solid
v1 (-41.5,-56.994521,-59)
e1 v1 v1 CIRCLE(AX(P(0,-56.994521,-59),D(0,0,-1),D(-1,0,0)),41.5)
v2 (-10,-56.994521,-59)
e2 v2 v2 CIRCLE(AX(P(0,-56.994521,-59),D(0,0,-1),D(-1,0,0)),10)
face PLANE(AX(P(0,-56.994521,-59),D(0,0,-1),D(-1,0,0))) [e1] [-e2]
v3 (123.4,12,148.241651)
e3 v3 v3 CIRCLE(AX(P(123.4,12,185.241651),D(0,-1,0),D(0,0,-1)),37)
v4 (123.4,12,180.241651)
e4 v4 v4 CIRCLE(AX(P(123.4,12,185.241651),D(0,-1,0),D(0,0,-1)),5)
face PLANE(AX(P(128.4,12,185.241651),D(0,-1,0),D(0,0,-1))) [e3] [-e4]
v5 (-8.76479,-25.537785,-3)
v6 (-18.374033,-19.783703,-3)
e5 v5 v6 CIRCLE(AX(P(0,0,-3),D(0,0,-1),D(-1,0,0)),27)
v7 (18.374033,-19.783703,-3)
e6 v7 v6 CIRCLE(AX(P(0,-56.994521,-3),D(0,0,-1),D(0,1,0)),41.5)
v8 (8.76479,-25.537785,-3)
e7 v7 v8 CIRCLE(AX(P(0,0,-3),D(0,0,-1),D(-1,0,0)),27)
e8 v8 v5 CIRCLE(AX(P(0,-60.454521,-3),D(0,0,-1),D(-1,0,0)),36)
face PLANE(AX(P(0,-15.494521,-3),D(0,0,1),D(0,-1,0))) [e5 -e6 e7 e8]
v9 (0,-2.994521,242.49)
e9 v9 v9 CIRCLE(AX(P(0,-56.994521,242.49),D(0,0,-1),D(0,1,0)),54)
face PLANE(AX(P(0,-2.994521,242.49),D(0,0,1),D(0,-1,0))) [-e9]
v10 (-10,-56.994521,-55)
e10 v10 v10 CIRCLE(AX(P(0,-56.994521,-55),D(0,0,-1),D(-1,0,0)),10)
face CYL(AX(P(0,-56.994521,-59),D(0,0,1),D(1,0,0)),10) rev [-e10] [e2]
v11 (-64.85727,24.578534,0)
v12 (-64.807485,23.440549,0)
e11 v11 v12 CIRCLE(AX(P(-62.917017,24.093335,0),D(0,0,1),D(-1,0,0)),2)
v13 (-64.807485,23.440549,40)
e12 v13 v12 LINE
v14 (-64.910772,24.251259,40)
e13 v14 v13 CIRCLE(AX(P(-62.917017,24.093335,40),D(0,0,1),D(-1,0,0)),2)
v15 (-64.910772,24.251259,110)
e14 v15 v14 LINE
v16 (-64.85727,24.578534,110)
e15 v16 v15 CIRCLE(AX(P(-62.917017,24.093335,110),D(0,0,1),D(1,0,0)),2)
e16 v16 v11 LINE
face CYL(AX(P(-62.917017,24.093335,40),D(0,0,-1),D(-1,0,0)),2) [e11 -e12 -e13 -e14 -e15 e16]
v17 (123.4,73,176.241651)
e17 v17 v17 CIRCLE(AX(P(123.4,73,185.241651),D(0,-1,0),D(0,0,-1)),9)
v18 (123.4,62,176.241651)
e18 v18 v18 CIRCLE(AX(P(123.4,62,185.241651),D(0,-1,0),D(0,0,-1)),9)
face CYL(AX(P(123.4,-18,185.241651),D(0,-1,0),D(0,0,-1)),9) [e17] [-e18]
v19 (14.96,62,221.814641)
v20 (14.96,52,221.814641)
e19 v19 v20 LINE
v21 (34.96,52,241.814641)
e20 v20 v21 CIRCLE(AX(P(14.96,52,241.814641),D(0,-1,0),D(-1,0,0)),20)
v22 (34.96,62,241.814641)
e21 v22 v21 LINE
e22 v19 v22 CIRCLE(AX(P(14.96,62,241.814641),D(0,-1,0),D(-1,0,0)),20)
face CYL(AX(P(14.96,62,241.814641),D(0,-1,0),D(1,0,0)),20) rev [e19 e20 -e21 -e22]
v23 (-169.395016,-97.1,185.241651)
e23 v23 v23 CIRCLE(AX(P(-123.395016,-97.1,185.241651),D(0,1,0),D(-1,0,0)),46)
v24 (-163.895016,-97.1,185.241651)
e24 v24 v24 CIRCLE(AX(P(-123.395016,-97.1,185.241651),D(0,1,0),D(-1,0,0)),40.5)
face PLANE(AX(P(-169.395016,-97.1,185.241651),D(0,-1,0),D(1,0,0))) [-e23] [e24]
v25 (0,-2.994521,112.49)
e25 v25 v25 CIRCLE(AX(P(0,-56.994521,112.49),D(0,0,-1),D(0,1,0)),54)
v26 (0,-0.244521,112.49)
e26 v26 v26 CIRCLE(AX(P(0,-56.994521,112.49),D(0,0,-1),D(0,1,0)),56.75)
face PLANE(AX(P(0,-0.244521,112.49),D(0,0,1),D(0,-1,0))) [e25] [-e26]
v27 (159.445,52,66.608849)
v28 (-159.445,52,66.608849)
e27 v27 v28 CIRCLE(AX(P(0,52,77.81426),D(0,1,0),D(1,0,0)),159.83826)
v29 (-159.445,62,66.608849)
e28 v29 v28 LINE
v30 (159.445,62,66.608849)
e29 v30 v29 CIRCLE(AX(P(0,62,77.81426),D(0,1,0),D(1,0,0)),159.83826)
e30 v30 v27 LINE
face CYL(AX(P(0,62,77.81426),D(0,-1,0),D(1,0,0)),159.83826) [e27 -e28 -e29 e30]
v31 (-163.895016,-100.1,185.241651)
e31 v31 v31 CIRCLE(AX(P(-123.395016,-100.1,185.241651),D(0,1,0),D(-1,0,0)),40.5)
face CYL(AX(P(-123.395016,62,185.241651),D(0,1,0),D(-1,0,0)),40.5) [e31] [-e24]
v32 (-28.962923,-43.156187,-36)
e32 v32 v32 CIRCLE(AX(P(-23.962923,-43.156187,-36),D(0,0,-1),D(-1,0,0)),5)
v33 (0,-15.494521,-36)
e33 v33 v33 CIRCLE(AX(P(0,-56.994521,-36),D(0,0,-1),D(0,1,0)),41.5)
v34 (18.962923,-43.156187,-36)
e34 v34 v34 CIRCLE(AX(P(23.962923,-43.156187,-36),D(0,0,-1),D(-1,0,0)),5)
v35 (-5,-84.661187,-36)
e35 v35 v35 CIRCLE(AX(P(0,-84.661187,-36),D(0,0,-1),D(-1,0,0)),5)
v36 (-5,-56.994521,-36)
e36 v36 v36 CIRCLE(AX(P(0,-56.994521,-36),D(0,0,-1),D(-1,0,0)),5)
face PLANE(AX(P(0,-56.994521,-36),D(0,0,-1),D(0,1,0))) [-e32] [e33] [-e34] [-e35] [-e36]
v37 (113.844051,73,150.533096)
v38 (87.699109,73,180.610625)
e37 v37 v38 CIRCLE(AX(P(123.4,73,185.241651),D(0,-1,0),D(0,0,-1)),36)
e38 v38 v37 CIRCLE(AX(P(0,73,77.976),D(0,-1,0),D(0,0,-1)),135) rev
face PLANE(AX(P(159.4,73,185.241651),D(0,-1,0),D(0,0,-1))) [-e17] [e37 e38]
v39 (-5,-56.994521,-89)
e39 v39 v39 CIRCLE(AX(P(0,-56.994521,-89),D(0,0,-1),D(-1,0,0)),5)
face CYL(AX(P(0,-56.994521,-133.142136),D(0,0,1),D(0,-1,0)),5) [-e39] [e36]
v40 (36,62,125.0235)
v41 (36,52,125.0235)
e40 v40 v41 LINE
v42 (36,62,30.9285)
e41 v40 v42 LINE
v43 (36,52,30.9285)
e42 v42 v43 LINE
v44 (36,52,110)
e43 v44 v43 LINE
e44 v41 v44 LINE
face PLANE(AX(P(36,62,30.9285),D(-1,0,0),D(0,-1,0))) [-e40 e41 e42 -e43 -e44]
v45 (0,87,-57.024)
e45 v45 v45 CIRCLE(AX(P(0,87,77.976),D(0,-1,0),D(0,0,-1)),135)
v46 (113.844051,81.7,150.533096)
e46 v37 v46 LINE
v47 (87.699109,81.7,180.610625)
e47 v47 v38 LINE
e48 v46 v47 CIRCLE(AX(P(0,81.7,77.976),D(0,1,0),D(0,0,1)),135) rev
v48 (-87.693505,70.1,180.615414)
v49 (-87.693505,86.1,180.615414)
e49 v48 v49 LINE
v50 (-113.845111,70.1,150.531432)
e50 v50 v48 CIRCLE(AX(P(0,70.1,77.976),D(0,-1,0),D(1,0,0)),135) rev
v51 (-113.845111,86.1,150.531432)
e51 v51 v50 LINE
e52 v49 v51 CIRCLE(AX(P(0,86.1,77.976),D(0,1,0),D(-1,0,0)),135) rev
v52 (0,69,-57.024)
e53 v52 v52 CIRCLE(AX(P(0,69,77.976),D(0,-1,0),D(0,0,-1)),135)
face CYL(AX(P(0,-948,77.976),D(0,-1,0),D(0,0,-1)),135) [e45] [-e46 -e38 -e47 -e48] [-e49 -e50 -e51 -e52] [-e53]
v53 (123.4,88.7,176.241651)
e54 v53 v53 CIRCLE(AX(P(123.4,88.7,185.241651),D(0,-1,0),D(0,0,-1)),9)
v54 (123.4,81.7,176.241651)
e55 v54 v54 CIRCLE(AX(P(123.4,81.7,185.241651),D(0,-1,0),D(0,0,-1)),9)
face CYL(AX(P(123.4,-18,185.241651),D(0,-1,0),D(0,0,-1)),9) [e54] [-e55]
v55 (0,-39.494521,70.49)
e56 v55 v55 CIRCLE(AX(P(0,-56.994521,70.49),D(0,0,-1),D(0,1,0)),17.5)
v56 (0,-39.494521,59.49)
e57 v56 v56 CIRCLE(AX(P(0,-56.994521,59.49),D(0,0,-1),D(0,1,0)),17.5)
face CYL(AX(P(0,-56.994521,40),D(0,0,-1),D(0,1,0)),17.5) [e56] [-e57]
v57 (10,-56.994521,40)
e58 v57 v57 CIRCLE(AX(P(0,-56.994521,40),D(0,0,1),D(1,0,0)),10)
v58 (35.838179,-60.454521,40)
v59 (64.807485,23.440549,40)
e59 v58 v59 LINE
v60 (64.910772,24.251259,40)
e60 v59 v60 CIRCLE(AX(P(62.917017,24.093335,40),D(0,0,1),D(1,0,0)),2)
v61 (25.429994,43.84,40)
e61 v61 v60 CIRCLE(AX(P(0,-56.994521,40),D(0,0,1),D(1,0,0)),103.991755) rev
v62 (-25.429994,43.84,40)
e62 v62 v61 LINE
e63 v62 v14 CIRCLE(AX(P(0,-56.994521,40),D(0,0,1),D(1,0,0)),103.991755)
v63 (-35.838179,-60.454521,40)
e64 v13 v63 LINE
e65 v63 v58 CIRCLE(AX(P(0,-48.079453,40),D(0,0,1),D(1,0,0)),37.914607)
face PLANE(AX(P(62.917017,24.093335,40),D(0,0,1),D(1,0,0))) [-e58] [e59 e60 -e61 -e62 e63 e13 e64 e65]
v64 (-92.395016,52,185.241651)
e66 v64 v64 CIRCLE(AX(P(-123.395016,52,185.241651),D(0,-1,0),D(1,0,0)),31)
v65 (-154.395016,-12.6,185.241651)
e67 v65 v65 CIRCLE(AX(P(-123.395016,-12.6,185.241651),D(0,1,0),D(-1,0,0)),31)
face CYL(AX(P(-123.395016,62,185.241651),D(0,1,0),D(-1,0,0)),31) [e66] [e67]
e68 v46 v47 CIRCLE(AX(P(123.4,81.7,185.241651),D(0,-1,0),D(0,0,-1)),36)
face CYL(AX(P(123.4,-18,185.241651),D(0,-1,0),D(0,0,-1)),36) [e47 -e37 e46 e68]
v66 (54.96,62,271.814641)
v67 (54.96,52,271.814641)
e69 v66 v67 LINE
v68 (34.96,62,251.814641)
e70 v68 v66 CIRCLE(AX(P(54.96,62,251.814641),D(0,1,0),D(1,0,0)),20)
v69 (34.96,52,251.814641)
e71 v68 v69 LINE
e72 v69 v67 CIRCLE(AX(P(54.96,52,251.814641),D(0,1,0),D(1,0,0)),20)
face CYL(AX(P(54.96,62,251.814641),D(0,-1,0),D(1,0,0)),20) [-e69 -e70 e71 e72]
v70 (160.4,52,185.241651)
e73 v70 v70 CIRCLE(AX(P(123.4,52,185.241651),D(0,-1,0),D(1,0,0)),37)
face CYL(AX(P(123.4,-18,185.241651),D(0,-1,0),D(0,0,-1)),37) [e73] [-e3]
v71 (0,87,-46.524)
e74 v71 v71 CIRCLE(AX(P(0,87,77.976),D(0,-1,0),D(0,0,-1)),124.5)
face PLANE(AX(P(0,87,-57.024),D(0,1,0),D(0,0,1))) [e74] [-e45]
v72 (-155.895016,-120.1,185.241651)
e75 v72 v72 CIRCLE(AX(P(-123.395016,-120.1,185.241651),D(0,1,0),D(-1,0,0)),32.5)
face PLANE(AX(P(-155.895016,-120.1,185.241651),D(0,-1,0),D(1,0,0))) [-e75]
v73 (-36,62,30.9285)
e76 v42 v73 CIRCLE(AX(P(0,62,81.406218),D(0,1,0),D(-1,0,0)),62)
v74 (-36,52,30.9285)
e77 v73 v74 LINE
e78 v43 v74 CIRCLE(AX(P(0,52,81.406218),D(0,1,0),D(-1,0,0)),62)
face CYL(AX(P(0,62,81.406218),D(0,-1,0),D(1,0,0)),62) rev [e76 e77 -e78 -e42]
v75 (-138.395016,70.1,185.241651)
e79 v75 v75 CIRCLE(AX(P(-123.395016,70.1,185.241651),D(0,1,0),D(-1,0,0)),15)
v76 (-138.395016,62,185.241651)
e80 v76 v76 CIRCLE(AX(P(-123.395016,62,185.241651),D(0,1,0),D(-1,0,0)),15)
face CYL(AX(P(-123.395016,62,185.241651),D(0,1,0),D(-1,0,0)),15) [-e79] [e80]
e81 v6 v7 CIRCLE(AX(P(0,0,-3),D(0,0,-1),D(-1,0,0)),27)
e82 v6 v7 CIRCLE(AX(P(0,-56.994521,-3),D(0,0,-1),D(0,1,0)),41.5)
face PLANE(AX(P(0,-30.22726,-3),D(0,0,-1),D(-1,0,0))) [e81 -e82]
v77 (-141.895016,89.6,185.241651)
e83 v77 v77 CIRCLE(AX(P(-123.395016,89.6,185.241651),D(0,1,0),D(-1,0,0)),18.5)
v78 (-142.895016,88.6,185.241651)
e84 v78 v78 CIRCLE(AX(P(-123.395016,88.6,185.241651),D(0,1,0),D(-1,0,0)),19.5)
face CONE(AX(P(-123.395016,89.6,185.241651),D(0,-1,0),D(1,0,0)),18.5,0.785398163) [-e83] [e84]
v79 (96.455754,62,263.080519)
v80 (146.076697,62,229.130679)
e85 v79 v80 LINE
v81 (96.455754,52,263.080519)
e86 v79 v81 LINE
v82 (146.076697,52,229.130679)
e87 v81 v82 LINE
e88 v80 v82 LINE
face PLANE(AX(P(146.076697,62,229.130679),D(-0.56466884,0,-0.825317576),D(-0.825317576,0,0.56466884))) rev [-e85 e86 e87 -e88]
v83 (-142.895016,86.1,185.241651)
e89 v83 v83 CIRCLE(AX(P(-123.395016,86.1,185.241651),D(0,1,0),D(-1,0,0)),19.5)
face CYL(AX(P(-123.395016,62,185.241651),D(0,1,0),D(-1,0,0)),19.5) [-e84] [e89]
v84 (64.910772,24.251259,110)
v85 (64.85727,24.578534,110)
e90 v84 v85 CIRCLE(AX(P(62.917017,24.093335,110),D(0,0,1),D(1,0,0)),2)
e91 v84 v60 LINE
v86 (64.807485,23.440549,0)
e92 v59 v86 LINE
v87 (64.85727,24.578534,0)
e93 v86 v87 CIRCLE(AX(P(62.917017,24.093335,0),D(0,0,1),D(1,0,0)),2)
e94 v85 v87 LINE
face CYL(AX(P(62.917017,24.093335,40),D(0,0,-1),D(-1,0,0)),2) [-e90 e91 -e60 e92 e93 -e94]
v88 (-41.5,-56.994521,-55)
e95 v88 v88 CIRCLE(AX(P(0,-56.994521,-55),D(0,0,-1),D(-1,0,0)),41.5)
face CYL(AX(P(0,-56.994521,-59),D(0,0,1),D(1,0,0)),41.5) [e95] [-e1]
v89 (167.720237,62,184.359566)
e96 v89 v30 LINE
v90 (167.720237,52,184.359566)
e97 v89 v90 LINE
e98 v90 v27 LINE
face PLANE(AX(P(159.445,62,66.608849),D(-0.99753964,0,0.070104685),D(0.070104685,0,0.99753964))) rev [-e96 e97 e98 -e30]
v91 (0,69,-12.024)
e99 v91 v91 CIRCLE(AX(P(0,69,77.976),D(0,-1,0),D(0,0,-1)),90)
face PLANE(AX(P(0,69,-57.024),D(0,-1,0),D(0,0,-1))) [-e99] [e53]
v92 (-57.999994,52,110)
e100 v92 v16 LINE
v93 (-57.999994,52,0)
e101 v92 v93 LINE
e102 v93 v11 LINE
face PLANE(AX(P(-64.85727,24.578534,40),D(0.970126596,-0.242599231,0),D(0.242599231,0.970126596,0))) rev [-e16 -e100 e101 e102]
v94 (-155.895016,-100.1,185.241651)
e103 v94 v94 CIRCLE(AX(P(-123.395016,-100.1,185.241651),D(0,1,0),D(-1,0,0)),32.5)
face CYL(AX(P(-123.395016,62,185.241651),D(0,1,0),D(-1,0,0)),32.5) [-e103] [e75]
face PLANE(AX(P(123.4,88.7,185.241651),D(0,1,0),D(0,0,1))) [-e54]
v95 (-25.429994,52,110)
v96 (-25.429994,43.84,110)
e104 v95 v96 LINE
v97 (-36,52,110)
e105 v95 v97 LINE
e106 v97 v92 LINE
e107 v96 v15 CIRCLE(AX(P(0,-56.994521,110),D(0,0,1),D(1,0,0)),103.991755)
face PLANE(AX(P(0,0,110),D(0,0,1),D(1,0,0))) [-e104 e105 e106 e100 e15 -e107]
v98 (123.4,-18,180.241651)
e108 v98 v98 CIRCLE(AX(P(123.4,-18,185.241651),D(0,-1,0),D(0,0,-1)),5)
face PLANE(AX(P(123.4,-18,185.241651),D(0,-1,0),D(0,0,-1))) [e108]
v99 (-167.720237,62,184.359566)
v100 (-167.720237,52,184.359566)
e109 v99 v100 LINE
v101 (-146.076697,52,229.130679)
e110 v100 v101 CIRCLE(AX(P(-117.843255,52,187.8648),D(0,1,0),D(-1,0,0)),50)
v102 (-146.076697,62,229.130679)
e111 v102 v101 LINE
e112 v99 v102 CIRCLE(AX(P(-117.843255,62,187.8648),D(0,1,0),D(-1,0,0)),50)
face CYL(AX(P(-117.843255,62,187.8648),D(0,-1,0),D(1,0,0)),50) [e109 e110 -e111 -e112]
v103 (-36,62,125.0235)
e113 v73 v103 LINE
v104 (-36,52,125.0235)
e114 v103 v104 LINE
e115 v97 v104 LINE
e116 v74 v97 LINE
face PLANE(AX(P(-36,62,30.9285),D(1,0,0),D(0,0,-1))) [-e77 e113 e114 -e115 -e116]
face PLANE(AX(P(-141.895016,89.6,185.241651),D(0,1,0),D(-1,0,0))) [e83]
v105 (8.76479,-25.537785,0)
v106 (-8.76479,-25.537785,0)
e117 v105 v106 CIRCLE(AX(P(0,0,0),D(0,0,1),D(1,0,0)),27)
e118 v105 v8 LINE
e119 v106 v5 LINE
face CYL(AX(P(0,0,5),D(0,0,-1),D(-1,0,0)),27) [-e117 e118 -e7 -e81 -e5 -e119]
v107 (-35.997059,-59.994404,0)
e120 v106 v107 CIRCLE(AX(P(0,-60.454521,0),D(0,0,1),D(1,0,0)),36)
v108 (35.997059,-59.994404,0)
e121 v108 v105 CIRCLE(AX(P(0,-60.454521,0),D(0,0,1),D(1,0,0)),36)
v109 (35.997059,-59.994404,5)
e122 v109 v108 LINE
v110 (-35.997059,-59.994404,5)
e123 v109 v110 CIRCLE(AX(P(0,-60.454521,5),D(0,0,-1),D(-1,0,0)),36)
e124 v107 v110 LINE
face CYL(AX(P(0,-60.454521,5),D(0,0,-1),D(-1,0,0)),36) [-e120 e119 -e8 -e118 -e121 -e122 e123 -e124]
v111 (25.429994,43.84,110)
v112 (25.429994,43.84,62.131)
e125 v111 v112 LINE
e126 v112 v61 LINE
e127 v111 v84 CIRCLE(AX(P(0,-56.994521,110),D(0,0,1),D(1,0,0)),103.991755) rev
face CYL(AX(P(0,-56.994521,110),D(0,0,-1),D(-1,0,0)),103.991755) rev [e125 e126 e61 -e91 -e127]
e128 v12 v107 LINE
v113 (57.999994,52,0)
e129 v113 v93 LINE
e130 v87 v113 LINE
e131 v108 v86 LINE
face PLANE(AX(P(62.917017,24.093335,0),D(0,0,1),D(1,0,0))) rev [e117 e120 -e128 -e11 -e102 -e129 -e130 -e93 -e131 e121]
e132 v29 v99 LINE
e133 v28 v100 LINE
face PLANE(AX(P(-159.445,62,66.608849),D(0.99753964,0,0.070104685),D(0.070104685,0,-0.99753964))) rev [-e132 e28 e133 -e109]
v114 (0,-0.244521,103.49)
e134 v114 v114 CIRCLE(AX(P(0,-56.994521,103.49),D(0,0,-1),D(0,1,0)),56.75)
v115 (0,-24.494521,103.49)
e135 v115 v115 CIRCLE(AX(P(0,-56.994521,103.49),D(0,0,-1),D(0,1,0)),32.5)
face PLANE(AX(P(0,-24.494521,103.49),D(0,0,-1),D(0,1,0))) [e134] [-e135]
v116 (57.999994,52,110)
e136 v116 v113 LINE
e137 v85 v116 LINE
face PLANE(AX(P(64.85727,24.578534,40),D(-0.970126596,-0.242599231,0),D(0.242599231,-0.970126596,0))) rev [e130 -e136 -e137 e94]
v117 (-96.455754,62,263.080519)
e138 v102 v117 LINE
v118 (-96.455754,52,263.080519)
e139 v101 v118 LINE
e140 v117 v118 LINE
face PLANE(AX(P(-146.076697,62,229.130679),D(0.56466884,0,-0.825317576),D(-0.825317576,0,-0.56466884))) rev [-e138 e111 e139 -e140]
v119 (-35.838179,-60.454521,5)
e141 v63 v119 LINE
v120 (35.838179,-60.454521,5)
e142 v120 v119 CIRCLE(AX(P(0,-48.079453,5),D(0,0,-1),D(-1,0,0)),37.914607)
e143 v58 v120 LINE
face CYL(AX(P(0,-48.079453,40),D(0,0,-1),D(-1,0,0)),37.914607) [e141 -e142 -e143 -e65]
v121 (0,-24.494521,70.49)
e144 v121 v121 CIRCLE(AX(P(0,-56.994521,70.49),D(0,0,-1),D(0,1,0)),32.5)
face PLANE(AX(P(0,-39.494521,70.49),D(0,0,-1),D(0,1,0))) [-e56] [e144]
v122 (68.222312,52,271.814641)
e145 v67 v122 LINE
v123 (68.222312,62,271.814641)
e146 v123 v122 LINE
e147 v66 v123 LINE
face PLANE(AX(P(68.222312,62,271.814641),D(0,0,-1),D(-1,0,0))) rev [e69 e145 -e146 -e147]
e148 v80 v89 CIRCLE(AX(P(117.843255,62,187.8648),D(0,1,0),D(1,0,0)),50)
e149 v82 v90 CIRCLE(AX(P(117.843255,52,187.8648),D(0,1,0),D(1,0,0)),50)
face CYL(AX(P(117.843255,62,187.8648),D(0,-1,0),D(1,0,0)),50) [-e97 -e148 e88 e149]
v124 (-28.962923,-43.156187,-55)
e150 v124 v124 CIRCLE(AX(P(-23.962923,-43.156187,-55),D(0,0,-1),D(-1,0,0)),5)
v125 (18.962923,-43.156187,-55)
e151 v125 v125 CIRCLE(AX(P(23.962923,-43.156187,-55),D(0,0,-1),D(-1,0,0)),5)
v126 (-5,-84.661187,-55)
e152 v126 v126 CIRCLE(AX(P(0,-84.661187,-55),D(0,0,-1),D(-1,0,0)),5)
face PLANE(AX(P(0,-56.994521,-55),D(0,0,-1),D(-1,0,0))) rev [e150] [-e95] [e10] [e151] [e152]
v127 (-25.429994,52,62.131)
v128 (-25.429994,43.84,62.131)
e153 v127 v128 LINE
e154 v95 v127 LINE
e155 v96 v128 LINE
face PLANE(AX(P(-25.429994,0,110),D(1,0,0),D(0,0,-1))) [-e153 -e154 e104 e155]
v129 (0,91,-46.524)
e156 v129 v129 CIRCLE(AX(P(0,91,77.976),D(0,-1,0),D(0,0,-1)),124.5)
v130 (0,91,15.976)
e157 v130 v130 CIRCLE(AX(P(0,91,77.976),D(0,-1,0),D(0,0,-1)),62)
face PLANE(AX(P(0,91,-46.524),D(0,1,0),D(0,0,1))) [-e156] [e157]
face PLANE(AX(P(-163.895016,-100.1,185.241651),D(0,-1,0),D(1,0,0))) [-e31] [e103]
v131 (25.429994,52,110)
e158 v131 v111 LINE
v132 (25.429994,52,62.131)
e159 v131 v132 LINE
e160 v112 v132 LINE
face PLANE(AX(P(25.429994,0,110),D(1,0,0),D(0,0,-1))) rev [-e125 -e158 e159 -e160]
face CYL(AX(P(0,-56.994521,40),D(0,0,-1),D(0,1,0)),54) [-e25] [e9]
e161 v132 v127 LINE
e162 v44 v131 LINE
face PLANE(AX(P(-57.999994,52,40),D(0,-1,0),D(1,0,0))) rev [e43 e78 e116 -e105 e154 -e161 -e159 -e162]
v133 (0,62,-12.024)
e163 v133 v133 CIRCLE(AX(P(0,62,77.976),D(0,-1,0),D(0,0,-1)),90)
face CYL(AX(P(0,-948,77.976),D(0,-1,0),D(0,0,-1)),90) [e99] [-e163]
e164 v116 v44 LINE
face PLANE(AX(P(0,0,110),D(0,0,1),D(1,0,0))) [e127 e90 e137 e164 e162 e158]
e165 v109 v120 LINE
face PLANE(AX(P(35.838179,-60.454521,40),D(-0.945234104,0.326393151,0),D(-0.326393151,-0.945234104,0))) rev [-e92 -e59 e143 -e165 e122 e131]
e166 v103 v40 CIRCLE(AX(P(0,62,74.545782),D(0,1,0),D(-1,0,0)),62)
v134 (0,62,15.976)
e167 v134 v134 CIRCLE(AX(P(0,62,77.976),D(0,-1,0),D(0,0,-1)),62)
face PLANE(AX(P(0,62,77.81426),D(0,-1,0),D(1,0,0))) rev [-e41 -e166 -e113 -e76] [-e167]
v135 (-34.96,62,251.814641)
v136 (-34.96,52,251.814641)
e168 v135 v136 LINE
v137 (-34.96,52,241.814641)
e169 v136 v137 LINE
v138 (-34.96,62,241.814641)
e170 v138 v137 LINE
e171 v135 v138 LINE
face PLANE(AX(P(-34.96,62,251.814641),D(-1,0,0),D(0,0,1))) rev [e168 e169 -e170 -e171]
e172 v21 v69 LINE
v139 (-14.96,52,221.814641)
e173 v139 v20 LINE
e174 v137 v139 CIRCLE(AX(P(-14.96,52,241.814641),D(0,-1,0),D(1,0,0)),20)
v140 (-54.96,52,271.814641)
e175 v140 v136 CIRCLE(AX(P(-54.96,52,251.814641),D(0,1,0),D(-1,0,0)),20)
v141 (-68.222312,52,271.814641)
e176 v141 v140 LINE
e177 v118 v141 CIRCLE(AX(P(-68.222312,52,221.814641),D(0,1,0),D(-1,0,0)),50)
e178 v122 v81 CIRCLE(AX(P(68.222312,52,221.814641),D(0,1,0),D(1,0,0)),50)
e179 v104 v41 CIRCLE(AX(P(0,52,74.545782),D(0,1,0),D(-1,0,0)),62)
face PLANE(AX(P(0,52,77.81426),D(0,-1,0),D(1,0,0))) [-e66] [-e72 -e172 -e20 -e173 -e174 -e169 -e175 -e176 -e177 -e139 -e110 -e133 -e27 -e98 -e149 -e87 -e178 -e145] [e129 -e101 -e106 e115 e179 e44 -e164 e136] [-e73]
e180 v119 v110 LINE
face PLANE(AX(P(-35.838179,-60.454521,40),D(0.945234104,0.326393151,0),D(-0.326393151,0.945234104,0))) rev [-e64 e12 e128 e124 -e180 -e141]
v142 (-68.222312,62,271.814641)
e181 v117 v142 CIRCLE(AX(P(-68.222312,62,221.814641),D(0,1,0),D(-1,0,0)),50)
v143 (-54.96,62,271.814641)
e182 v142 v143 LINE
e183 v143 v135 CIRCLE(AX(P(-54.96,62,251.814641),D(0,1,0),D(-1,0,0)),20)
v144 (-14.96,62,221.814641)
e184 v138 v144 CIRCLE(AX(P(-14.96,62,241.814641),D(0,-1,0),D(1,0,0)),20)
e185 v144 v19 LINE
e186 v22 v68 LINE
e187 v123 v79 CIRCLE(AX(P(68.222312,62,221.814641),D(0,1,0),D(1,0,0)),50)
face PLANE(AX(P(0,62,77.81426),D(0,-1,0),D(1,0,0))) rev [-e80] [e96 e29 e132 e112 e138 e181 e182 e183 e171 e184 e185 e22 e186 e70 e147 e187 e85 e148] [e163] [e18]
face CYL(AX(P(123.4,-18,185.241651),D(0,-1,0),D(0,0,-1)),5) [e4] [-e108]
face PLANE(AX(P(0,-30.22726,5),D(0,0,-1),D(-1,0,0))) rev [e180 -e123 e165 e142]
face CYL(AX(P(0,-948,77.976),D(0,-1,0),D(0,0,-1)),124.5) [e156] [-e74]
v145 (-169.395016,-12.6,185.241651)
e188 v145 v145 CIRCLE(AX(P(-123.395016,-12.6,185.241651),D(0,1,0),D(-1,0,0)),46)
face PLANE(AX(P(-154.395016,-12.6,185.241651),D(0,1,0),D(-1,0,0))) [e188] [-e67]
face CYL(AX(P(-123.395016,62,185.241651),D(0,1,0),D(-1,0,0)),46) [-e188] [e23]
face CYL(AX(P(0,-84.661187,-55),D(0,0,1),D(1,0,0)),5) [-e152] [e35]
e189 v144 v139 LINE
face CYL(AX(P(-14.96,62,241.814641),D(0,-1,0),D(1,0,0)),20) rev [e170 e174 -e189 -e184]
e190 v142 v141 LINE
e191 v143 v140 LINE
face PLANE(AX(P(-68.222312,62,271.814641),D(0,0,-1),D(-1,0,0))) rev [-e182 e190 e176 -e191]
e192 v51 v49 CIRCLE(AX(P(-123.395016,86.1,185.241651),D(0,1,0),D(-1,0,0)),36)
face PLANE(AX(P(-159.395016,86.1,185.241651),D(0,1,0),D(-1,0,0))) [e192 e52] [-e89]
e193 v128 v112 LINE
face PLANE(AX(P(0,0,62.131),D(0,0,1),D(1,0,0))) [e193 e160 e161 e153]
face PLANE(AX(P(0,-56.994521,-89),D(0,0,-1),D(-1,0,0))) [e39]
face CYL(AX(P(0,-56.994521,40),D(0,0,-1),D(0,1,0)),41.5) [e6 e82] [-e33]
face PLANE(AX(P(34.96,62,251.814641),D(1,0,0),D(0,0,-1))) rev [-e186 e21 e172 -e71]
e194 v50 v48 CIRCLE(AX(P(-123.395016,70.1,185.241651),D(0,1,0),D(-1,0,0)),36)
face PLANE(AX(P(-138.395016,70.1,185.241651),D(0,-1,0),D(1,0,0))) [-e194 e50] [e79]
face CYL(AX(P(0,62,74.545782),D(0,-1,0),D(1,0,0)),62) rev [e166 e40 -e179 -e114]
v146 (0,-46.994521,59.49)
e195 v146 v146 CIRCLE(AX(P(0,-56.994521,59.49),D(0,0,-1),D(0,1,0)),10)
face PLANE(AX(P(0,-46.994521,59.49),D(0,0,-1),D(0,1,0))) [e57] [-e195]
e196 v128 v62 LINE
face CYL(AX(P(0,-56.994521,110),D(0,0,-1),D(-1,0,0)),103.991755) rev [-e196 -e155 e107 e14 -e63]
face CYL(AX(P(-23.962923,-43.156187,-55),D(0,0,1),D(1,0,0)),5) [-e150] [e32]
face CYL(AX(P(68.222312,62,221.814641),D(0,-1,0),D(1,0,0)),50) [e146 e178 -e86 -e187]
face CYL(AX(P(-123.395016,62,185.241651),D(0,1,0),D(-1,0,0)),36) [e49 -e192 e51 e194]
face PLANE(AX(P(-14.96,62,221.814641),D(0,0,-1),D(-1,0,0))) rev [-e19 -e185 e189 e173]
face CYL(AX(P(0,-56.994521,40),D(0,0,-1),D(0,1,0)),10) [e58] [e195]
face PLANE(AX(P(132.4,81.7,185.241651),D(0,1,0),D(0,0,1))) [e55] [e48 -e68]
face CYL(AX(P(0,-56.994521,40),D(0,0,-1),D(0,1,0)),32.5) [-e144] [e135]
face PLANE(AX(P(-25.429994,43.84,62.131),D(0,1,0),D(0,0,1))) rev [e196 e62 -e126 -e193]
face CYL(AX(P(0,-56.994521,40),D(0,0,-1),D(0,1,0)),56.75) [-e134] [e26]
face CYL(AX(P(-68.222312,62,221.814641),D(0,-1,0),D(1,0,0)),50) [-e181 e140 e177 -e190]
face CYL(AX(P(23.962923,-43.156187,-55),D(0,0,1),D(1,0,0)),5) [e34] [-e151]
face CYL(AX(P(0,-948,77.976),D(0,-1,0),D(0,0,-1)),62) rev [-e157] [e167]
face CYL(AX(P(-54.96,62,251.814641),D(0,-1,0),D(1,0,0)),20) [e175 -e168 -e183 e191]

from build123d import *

# Parameters (mm, degrees)
ESTRUSIONE_ESTRUSIONE1_DEPTH      = 40
ESTRUSIONE_ESTRUSIONE2_DEPTH      = 70
SCHIZZO27_W                       = 50.85998704
SCHIZZO27_H                       = 8.16
ESTRUSIONE_ESTRUSIONE10_DEPTH     = 22.131
ESTRUSIONE_ESTRUSIONE5_DEPTH      = 3
ESTRUSIONE_ESTRUSIONE5_DEPTH_BACK = 5
SCHIZZO9_W                        = 33
SCHIZZO9_H                        = 41.5
SCHIZZO14_R                       = 5
ESTRUSIONE_ESTRUSIONE6_DEPTH      = 19
SCHIZZO15_R                       = 41.5
SCHIZZO15_R_2                     = 10
ESTRUSIONE_ESTRUSIONE7_DEPTH      = 4
SCHIZZO16_R                       = 5
ESTRUSIONE_ESTRUSIONE8_DEPTH      = 53
ESTRUSIONE_ESTRUSIONE9_DEPTH      = 10


# Read off the part's stored shape, not the designer's step: Estrusione-Estrusione2
with BuildPart() as part:
    # Schizzo1 → Estrusione-Estrusione1 (new body)
    with BuildSketch(Plane.XY):
        with BuildLine():
            Line((-35.838179279, -60.454520749), (-64.807485396, 23.440548807))
            ThreePointArc((-64.807485396, 23.440548807), (-64.915106011, 24.005921967), (-64.857270382, 24.57853357))
            Line((-64.857270382, 24.57853357), (-57.99999352, 52))
            Line((-57.99999352, 52), (57.99999352, 52))
            Line((57.99999352, 52), (64.857270382, 24.57853357))
            ThreePointArc((64.857270382, 24.57853357), (64.915106011, 24.005921967), (64.807485396, 23.440548807))
            Line((64.807485396, 23.440548807), (35.838179279, -60.454520749))
            ThreePointArc((35.838179279, -60.454520749), (0, -85.994059495), (-35.838179279, -60.454520749))
        make_face()
    extrude(amount=ESTRUSIONE_ESTRUSIONE1_DEPTH)

    # Estrusione-Estrusione2 outline → Estrusione-Estrusione2 (add)
    with BuildSketch(Plane.XY.offset(40)):
        with BuildLine():
            Line((57.99999352, 52), (25.42999352, 52))
            Line((25.42999352, 52), (25.42999352, 43.84))
            ThreePointArc((25.42999352, 43.84), (46.220051809, 36.161219578), (64.910772431, 24.251259249))
            ThreePointArc((64.910772431, 24.251259249), (64.890816245, 24.416007214), (64.857270382, 24.57853357))
            Line((64.857270382, 24.57853357), (57.99999352, 52))
        make_face()
        with BuildLine():
            Line((-25.42999352, 52), (-57.99999352, 52))
            Line((-57.99999352, 52), (-64.857270382, 24.57853357))
            ThreePointArc((-64.857270382, 24.57853357), (-64.890816245, 24.416007214), (-64.910772431, 24.251259249))
            ThreePointArc((-64.910772431, 24.251259249), (-46.220051809, 36.161219578), (-25.42999352, 43.84))
            Line((-25.42999352, 43.84), (-25.42999352, 52))
        make_face()
    extrude(amount=ESTRUSIONE_ESTRUSIONE2_DEPTH)

    # Schizzo27 → Estrusione-Estrusione10 (add)
    with BuildSketch(Plane.XY.offset(40)):
        with Locations((0, 47.92)):
            Rectangle(SCHIZZO27_W, SCHIZZO27_H)
    extrude(amount=ESTRUSIONE_ESTRUSIONE10_DEPTH)

    # Schizzo12 → Estrusione-Estrusione5 (add, two sides: drawn at the far end of the back side and taken through both)
    with BuildSketch(Plane(origin=(0, 0, 0), x_dir=(-1, 0, 0), z_dir=(0, 0, -1)).offset(-ESTRUSIONE_ESTRUSIONE5_DEPTH_BACK)):
        with BuildLine():
            ThreePointArc((8.764790291, -25.537784774), (0, 27), (-8.764790291, -25.537784774))
            ThreePointArc((-8.764790291, -25.537784774), (0, -96.454520749), (8.764790291, -25.537784774))
        make_face()
    extrude(amount=ESTRUSIONE_ESTRUSIONE5_DEPTH + ESTRUSIONE_ESTRUSIONE5_DEPTH_BACK)

    # Schizzo9 → Rivoluzione4 (revolve)
    with BuildSketch(Plane(origin=(0, 0, 0), x_dir=(0, 0, -1), z_dir=(1, 0, 0))):
        Polygon((-40, -46.994520749), (-59.49, -46.994520749), (-59.49, -39.494520749), (-70.49, -39.494520749), (-70.49, -24.494520749), (-103.49, -24.494520749), (-103.49, -0.244520749), (-112.49, -0.244520749), (-112.49, -2.994520749), (-242.49, -2.994520749), (-242.49, -56.994520749), (-40, -56.994520749), align=None)
        with Locations((19.5, -36.244520749)):
            Rectangle(SCHIZZO9_W, SCHIZZO9_H)
    revolve(axis=Axis((0, -56.994520749, 40), (0, 0, 1)))

    # Schizzo14 → Estrusione-Estrusione6 (add)
    with BuildSketch(Plane(origin=(0, 0, -36), x_dir=(-1, 0, 0), z_dir=(0, 0, -1))):
        with Locations((0, -84.661187416)):
            Circle(SCHIZZO14_R)
        with Locations((-23.962922923, -43.156187416)):
            Circle(SCHIZZO14_R)
        with Locations((23.962922923, -43.156187416)):
            Circle(SCHIZZO14_R)
    extrude(amount=ESTRUSIONE_ESTRUSIONE6_DEPTH)

    # Schizzo15 → Estrusione-Estrusione7 (add)
    with BuildSketch(Plane(origin=(0, 0, -55), x_dir=(-1, 0, 0), z_dir=(0, 0, -1))):
        with Locations(Location((0, -56.994520749, 0), (0, 0, 90))):
            Circle(SCHIZZO15_R)
        with Locations(Location((0, -56.994520749, 0), (0, 0, 90))):
            Circle(SCHIZZO15_R_2, mode=Mode.SUBTRACT)
    extrude(amount=ESTRUSIONE_ESTRUSIONE7_DEPTH)

    # Schizzo16 → Estrusione-Estrusione8 (add)
    with BuildSketch(Plane(origin=(0, 0, -36), x_dir=(-1, 0, 0), z_dir=(0, 0, -1))):
        with Locations((0, -56.994520749)):
            Circle(SCHIZZO16_R)
    extrude(amount=ESTRUSIONE_ESTRUSIONE8_DEPTH)

    # Schizzo17 → Estrusione-Estrusione9 (add)
    with BuildSketch(Plane(origin=(0, 52, 0), x_dir=(1, 0, 0), z_dir=(0, 1, 0))):
        with BuildLine():
            Line((-159.445, -66.608848829), (-167.720236988, -184.359565795))
            ThreePointArc((-167.720236988, -184.359565795), (-162.859060274, -209.626630738), (-146.076696991, -229.130678845))
            Line((-146.076696991, -229.130678845), (-96.455754418, -263.080519362))
            ThreePointArc((-96.455754418, -263.080519362), (-82.999085751, -269.581228991), (-68.222312421, -271.814640564))
            Line((-68.222312421, -271.814640564), (-54.96, -271.814640564))
            ThreePointArc((-54.96, -271.814640564), (-40.817864376, -265.956776188), (-34.96, -251.814640564))
            Line((-34.96, -251.814640564), (-34.96, -241.814640564))
            ThreePointArc((-34.96, -241.814640564), (-29.102135624, -227.67250494), (-14.96, -221.814640564))
            Line((-14.96, -221.814640564), (14.96, -221.814640564))
            ThreePointArc((14.96, -221.814640564), (29.102135624, -227.67250494), (34.96, -241.814640564))
            Line((34.96, -241.814640564), (34.96, -251.814640564))
            ThreePointArc((34.96, -251.814640564), (40.817864376, -265.956776188), (54.96, -271.814640564))
            Line((54.96, -271.814640564), (68.222312421, -271.814640564))
            ThreePointArc((68.222312421, -271.814640564), (82.999085751, -269.581228991), (96.455754418, -263.080519362))
            Line((96.455754418, -263.080519362), (146.076696991, -229.130678845))
            ThreePointArc((146.076696991, -229.130678845), (162.859060274, -209.626630738), (167.720236988, -184.359565795))
            Line((167.720236988, -184.359565795), (159.445, -66.608848829))
            ThreePointArc((159.445, -66.608848829), (0, 82.024), (-159.445, -66.608848829))
        make_face()
        with BuildLine():
            Line((-36, -30.9285), (-36, -125.0235))
            ThreePointArc((-36, -125.0235), (0, -136.545782144), (36, -125.0235))
            Line((36, -125.0235), (36, -30.9285))
            ThreePointArc((36, -30.9285), (0, -19.406217856), (-36, -30.9285))
        make_face(mode=Mode.SUBTRACT)
    extrude(amount=ESTRUSIONE_ESTRUSIONE9_DEPTH)

    # Schizzo19 → Rivoluzione5 (revolve)
    with BuildSketch(Plane(origin=(0, 0, 0), x_dir=(0, 0, -1), z_dir=(1, 0, 0))):
        Polygon((57.024, 87), (57.024, 69), (12.024, 69), (12.024, 62), (-15.976, 62), (-15.976, 91), (46.524, 91), (46.524, 87), align=None)
    revolve(axis=Axis((0, -948, 77.976), (0, 1, 0)))

    # Schizzo23 → Rivoluzione6 (revolve)
    with BuildSketch(Plane.XY.offset(185.24165124)):
        Polygon((-123.395016366, 62), (-138.395016366, 62), (-138.395016366, 70.1), (-159.395016366, 70.1), (-159.395016366, 86.1), (-142.895016366, 86.1), (-142.895016366, 88.6), (-141.895016366, 89.6), (-123.395016366, 89.6), align=None)
        Polygon((-123.395016366, 52), (-154.395016366, 52), (-154.395016366, -12.6), (-169.395016366, -12.6), (-169.395016366, -97.1), (-163.895016366, -97.1), (-163.895016366, -100.1), (-155.895016366, -100.1), (-155.895016366, -120.1), (-123.395016366, -120.1), align=None)
    revolve(axis=Axis((-123.395016366, 62, 185.24165124), (0, -1, 0)))

    # Schizzo24 → Rivoluzione7 (revolve)
    with BuildSketch(Plane.XY.offset(185.24165124), mode=Mode.PRIVATE) as rivoluzione7_sk:
        Polygon((123.4, 62), (123.4, 88.7), (132.4, 88.7), (132.4, 81.7), (159.4, 81.7), (159.4, 73), (132.4, 73), (132.4, 62), align=None)
        Polygon((123.4, 52), (123.4, -18), (128.4, -18), (128.4, 12), (160.4, 12), (160.4, 52), align=None)
    revolve(rivoluzione7_sk.sketch.rotate(Axis((123.4, -18, 185.24165124), (0, 1, 0)), 90), axis=Axis((123.4, -18, 185.24165124), (0, 1, 0)))


solid = part.part
